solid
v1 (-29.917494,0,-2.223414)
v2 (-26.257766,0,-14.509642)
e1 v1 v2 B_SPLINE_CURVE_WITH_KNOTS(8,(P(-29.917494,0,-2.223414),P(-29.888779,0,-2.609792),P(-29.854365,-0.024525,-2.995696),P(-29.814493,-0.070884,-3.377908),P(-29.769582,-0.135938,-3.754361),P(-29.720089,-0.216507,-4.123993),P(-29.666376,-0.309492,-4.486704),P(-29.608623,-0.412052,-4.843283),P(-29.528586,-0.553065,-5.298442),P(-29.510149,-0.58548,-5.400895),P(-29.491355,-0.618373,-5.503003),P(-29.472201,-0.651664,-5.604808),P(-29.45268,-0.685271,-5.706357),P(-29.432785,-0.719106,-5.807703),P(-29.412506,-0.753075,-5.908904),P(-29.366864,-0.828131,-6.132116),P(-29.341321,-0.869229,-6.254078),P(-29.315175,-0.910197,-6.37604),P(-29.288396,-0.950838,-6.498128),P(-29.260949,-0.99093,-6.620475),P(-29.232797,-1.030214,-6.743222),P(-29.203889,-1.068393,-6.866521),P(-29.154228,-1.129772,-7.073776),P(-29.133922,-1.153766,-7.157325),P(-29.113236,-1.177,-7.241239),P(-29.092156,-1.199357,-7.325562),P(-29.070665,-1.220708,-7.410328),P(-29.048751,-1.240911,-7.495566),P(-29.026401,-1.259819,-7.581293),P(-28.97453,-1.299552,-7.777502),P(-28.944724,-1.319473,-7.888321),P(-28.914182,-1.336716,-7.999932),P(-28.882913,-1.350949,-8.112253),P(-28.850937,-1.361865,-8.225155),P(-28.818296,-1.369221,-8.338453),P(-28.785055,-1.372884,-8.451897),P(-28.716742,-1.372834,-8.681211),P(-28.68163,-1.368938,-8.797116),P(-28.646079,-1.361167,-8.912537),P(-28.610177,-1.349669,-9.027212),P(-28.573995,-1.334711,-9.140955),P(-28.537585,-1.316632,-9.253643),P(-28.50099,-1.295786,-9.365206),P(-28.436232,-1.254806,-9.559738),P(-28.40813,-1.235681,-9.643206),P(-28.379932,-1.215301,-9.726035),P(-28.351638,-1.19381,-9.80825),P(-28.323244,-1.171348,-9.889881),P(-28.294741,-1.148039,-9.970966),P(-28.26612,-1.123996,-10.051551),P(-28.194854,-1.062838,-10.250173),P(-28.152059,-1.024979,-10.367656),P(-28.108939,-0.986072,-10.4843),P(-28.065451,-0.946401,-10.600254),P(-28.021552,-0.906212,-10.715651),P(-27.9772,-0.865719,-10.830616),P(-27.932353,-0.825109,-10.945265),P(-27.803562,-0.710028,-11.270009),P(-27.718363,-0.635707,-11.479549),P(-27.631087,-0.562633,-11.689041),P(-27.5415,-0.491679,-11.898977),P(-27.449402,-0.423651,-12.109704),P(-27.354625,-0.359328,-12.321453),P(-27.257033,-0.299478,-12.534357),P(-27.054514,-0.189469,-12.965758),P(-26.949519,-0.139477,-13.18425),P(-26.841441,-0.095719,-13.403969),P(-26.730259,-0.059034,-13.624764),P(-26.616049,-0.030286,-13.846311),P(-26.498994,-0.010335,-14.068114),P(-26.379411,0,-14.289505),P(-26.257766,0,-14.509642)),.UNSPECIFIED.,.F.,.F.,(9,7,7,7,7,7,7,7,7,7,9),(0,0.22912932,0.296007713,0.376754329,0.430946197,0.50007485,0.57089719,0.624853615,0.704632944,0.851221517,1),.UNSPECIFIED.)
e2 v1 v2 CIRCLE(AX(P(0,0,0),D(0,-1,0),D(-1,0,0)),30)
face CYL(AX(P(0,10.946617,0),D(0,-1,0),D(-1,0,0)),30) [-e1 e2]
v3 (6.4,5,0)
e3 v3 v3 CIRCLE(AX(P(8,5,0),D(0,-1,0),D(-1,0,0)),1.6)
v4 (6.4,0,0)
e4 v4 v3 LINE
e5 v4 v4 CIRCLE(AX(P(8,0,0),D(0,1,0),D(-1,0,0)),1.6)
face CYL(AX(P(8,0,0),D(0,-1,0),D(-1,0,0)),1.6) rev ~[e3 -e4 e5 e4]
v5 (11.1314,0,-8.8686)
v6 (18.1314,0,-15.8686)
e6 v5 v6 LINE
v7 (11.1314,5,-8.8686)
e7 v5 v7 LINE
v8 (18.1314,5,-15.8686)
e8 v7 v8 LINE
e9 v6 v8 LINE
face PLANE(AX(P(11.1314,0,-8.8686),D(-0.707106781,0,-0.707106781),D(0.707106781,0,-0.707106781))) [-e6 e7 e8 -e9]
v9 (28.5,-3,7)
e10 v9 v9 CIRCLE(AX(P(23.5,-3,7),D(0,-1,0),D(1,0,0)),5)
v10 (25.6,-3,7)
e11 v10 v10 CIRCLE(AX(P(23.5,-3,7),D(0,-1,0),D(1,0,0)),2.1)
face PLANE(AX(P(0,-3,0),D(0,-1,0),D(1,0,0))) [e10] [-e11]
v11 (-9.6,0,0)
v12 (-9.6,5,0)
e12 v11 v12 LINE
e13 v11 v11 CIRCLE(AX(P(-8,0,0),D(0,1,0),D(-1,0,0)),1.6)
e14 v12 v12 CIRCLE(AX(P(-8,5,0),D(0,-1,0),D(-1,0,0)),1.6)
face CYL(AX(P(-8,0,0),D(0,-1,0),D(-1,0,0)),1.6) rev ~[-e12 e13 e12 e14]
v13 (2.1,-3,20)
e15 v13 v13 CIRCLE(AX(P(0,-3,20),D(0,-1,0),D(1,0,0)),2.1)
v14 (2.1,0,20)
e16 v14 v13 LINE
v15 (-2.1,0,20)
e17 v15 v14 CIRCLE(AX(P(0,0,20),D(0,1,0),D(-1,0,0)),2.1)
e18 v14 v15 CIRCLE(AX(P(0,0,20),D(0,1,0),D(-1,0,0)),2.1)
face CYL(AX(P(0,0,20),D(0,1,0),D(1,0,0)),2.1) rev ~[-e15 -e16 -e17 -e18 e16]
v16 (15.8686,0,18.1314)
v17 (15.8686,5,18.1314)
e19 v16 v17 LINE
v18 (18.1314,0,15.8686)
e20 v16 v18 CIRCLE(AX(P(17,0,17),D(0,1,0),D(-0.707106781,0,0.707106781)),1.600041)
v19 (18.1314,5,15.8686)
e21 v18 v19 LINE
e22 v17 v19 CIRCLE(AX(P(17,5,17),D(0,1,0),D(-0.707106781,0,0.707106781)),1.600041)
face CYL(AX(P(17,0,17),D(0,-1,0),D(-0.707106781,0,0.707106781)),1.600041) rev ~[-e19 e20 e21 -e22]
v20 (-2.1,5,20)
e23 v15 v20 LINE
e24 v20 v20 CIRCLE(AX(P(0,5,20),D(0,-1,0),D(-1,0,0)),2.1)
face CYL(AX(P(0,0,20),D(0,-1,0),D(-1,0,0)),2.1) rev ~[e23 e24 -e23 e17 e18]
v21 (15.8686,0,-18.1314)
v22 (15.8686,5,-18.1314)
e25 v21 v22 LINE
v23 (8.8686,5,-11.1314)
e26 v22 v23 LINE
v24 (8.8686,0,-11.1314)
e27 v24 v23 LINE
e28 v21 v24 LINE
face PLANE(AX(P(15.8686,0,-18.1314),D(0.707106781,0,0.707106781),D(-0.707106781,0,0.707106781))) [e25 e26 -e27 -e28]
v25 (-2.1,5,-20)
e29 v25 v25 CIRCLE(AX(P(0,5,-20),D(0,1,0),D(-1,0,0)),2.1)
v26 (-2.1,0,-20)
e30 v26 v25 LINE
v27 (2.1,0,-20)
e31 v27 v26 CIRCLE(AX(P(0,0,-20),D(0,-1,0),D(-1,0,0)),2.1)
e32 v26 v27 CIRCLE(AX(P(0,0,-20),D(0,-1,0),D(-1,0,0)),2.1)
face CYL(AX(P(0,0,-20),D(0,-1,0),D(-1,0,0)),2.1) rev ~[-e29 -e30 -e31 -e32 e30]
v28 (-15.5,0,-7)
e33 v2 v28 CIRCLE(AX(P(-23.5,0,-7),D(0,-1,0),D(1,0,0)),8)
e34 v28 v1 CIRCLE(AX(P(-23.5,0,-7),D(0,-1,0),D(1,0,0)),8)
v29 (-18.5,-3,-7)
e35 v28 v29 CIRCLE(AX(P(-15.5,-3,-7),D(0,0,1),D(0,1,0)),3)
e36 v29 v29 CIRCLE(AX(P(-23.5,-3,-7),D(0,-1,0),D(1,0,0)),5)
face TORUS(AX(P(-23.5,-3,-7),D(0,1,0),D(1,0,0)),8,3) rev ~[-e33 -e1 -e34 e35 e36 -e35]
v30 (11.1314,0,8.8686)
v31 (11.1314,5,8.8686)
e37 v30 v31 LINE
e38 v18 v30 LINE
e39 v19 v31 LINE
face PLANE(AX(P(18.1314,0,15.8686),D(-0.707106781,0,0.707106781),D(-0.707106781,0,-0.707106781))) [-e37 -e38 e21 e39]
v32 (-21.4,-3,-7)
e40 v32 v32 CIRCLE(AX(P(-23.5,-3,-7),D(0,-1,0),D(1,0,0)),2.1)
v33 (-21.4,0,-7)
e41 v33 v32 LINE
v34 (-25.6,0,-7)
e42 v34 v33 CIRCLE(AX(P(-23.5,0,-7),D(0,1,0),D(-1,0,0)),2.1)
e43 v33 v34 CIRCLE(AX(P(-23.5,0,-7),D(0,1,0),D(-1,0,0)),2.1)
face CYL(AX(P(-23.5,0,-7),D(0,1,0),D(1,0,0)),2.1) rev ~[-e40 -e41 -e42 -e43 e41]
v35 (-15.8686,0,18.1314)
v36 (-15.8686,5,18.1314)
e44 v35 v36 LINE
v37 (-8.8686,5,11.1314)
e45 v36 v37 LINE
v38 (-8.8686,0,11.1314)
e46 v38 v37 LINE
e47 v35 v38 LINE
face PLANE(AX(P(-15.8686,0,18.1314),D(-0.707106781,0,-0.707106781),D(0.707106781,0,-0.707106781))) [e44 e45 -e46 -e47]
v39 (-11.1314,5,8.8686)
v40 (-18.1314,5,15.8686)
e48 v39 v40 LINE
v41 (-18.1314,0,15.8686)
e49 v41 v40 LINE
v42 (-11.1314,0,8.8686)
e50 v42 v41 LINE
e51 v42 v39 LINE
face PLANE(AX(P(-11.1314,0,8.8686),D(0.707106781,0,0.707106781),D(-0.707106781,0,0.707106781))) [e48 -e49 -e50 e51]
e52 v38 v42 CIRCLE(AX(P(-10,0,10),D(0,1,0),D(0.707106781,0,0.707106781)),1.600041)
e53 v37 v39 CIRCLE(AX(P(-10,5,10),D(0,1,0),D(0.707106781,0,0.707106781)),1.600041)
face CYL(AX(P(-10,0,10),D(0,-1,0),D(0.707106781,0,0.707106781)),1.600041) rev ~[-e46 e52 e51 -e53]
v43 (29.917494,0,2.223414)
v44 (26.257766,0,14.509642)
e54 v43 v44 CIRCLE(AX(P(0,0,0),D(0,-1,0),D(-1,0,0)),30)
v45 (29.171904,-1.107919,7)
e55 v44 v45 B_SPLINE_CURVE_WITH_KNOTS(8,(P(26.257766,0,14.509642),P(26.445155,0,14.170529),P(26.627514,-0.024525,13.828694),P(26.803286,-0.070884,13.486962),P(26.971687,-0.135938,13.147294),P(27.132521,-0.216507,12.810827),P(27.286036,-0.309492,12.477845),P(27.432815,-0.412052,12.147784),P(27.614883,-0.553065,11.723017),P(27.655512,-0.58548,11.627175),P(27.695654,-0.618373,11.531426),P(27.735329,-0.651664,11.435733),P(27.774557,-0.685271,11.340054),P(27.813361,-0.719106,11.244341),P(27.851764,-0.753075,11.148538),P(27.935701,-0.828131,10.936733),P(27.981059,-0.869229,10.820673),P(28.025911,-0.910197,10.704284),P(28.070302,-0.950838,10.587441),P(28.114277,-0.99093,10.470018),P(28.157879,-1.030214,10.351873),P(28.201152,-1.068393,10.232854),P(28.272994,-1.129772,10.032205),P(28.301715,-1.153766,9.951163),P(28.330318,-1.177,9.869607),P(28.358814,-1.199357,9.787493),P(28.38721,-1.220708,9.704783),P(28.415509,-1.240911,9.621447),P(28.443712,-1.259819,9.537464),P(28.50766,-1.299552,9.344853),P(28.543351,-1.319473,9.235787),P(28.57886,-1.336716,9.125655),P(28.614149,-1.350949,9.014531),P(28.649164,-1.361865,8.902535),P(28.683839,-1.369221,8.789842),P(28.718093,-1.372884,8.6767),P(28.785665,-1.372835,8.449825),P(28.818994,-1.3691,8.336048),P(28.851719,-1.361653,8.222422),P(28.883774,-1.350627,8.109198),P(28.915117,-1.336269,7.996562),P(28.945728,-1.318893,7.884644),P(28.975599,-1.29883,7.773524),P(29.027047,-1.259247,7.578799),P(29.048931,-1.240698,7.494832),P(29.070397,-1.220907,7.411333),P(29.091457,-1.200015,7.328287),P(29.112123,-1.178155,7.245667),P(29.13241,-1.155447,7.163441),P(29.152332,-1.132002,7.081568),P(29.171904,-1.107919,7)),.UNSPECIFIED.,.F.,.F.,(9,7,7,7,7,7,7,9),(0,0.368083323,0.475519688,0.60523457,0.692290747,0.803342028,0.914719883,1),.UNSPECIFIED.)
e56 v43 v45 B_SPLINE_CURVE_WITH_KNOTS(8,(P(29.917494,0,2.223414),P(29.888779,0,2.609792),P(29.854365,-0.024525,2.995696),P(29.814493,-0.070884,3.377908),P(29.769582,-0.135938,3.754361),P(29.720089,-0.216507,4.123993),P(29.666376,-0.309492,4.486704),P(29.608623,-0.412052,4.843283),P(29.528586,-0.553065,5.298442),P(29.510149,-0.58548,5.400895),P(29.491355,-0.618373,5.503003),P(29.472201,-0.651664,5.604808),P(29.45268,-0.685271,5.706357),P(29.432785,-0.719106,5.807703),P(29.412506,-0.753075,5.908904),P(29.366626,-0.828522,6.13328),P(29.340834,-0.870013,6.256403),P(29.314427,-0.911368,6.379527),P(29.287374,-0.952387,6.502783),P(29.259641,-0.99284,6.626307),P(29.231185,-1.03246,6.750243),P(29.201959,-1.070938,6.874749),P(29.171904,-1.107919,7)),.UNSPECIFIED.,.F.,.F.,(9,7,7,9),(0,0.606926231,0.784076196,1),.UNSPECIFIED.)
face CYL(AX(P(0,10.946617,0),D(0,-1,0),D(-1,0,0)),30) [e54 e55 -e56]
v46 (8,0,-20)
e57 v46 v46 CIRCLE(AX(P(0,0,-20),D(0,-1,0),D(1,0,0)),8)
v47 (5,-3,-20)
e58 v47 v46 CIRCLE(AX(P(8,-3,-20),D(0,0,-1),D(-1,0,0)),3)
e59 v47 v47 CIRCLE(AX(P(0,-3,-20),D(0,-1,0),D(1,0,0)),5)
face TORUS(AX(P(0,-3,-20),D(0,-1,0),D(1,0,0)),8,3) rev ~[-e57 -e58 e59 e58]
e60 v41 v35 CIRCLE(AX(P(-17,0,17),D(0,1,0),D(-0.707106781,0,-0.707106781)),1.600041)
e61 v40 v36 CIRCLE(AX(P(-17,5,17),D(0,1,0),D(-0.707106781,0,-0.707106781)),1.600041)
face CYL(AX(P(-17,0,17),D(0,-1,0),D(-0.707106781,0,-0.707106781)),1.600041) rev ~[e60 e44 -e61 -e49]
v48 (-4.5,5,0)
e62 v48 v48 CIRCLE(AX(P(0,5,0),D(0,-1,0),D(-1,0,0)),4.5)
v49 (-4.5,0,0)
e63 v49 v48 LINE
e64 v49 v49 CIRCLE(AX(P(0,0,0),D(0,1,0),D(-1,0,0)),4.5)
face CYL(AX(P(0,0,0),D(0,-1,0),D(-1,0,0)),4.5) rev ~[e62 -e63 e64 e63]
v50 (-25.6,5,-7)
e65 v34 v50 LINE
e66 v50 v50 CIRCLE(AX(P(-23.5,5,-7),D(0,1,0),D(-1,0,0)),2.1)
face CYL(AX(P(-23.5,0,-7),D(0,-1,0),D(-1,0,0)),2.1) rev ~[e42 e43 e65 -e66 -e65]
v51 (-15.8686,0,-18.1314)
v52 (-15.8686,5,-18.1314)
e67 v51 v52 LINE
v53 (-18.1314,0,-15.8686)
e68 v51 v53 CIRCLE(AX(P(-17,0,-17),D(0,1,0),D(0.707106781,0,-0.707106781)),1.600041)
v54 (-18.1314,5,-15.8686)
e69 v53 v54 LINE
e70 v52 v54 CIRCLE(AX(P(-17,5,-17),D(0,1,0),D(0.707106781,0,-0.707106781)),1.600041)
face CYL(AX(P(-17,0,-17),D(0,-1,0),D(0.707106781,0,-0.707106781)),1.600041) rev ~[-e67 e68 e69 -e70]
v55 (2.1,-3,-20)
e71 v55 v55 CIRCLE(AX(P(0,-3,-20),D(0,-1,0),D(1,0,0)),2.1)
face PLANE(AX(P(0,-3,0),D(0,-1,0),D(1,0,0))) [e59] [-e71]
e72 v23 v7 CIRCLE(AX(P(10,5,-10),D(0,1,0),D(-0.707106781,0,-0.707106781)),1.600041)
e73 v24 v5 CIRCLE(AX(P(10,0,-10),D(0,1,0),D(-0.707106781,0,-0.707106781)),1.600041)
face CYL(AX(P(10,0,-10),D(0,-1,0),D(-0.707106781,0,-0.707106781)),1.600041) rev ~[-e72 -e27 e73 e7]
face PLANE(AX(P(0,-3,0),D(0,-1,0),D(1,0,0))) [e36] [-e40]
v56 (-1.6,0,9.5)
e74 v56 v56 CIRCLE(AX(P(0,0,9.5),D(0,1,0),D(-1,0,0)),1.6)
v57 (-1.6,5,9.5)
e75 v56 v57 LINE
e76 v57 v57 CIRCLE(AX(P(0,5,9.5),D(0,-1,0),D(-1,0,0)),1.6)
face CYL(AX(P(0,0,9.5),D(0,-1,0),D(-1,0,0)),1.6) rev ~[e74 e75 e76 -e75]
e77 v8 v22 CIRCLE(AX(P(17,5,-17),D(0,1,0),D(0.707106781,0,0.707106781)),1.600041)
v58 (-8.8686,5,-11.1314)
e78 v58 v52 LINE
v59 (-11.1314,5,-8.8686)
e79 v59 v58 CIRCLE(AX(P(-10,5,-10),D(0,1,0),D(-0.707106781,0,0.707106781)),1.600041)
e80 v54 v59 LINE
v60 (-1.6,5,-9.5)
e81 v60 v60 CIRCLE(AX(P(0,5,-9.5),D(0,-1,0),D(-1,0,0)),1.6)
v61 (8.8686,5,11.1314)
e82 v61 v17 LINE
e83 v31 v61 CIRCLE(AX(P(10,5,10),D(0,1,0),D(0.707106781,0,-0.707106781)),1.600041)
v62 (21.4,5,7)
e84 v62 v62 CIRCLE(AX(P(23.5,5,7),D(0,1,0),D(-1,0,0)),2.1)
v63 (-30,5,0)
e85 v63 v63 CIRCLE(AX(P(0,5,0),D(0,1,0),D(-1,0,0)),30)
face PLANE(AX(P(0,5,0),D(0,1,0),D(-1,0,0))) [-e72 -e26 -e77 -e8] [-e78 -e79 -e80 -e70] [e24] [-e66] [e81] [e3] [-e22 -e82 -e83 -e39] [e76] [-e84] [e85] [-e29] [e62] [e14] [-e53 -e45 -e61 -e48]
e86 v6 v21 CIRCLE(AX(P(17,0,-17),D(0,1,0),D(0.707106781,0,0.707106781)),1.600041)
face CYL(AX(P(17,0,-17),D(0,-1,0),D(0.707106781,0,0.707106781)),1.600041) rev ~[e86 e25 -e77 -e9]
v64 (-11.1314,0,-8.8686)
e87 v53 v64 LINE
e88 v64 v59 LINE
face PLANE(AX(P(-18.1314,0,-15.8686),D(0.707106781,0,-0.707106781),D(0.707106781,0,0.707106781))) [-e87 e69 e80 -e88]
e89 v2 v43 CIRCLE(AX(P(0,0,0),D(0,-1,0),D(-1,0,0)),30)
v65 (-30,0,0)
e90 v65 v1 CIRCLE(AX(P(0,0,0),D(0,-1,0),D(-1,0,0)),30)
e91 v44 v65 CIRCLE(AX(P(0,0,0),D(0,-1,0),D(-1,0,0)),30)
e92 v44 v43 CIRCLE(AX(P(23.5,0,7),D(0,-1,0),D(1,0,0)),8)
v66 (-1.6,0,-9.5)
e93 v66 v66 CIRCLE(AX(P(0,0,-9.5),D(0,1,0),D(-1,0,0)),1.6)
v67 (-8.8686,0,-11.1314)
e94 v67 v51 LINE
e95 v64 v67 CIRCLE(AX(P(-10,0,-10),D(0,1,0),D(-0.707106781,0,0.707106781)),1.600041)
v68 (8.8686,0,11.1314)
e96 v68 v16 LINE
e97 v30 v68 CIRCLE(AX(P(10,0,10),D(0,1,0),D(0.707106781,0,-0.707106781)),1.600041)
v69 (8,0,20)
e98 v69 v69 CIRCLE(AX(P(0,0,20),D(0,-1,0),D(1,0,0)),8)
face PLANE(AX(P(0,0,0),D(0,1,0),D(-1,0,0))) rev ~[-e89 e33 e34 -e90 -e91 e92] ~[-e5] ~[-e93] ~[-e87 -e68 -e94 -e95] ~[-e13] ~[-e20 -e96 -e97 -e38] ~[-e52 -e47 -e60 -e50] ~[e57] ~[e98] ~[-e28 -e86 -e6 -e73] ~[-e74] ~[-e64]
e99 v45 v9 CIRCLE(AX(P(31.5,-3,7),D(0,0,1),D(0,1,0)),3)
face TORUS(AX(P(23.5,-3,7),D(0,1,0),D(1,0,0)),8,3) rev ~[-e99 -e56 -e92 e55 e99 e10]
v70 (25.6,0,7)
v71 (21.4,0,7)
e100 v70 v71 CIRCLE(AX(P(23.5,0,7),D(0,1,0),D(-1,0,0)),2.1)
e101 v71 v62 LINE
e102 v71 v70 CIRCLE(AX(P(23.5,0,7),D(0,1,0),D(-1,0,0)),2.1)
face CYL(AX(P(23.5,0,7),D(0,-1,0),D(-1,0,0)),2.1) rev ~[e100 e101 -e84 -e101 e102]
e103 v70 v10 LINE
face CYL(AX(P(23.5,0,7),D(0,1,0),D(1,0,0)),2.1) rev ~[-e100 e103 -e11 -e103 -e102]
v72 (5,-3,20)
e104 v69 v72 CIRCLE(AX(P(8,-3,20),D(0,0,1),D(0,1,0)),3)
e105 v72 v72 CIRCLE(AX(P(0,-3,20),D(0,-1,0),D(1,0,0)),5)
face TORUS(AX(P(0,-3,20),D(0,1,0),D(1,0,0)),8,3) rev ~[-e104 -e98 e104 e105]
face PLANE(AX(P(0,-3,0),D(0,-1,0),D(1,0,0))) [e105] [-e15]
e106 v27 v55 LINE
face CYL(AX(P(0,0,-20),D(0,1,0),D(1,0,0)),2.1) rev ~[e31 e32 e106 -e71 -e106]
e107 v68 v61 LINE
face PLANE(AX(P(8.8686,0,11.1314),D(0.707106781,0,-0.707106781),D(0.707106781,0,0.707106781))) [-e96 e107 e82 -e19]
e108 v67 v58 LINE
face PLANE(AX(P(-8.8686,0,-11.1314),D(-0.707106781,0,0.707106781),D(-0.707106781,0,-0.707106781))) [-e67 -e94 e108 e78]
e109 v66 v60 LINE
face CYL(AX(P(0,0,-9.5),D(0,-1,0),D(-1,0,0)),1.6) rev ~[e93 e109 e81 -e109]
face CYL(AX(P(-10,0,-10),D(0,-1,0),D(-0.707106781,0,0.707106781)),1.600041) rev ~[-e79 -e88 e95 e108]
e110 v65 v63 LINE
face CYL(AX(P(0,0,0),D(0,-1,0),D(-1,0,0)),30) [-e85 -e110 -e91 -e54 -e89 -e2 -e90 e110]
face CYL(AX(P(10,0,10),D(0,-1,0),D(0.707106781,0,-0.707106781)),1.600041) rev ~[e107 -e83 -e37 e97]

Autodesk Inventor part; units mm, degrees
ref_plane "YZ Plane" through (0, 0, 0) normal (1, 0, 0) x (0, 1, 0)
ref_plane "XZ Plane" through (0, 0, 0) normal (0, 1, 0) x (-1, 0, 0)
ref_plane "XY Plane" through (0, 0, 0) normal (0, 0, 1) x (1, 0, 0)
sketch "스케치1" plane through (0, 0, 0) normal (0, 1, 0) x (-1, 0, 0)
  line L0 (23.5, -7) -> (-23.5, -7) construction
  line L1 (-23.5, -7) -> (-23.5, 7) construction
  line L2 (-23.5, 7) -> (23.5, 7) construction
  line L3 (23.5, 7) -> (23.5, -7) construction
  circle A0 centre (23.5, -7) radius 2.1
  circle A1 centre (-23.5, 7) radius 2.1
  circle A2 centre (0, -20) radius 2.1
  circle A3 centre (0, 20) radius 2.1
  circle A4 centre (0, 0) radius 4.5
  circle A5 centre (8, 0) radius 1.6
  circle A6 centre (0, 9.5) radius 1.6
  circle A7 centre (-8, 0) radius 1.6
  circle A8 centre (0, -9.5) radius 1.6
  line L4 (8, 0) -> (0, -9.5) construction
  line L5 (0, -9.5) -> (-8, 0) construction
  line L6 (-8, 0) -> (0, 9.5) construction
  line L7 (0, 9.5) -> (8, 0) construction
  line L8 (10, -10) -> (17, -17) construction
  line L9 (8.8686, -11.1314) -> (15.8686, -18.1314)
  line L10 (18.1314, -15.8686) -> (11.1314, -8.8686)
  arc A9 (11.1314, -8.8686) -> (8.8686, -11.1314) centre (10, -10) ccw
  arc A10 (15.8686, -18.1314) -> (18.1314, -15.8686) centre (17, -17) ccw
  line L11 (-10, -10) -> (-17, -17) construction
  line L12 (-11.1314, -8.8686) -> (-18.1314, -15.8686)
  line L13 (-15.8686, -18.1314) -> (-8.8686, -11.1314)
  arc A11 (-8.8686, -11.1314) -> (-11.1314, -8.8686) centre (-10, -10) ccw
  arc A12 (-18.1314, -15.8686) -> (-15.8686, -18.1314) centre (-17, -17) ccw
  line L14 (10, 10) -> (17, 17) construction
  line L15 (11.1314, 8.8686) -> (18.1314, 15.8686)
  line L16 (15.8686, 18.1314) -> (8.8686, 11.1314)
  arc A13 (8.8686, 11.1314) -> (11.1314, 8.8686) centre (10, 10) ccw
  arc A14 (18.1314, 15.8686) -> (15.8686, 18.1314) centre (17, 17) ccw
  line L17 (-10, 10) -> (-17, 17) construction
  line L18 (-8.8686, 11.1314) -> (-15.8686, 18.1314)
  line L19 (-18.1314, 15.8686) -> (-11.1314, 8.8686)
  arc A15 (-11.1314, 8.8686) -> (-8.8686, 11.1314) centre (-10, 10) ccw
  arc A16 (-15.8686, 18.1314) -> (-18.1314, 15.8686) centre (-17, 17) ccw
  line L20 (10, -10) -> (-10, -10) construction
  line L21 (-10, -10) -> (-10, 10) construction
  line L22 (-10, 10) -> (10, 10) construction
  line L23 (10, 10) -> (10, -10) construction
  circle A17 centre (0, 0) radius 30
  line L24 (42, 0) -> (-42, 0) projected
  line L25 (0, -42) -> (0, 42) projected
  line L26 (0, 9.5) -> (0, -9.5) construction
  line L27 (8, 0) -> (-8, 0) construction
  line L28 (28.5, -25) -> (-28.5, -25)
  line L29 (-28.5, -25) -> (-28.5, 25)
  line L30 (-28.5, 25) -> (28.5, 25)
  line L31 (28.5, 25) -> (28.5, -25)
  point P0 (13.5, -13.5)
  point P1 (-13.5, -13.5)
  point P2 (13.5, 13.5)
  point P3 (-13.5, 13.5)
  dimension "d0" = 4.2
  dimension "d1" = 40
  dimension "d2" = 47
  dimension "d3" = 14
  dimension "d4" = 3.2
  dimension "d5" = 16
  dimension "d6" = 19
  dimension "d7" = 9
  dimension "d8" = 20
  dimension "d9" = 34
  dimension "d10" = 1.6
  dimension "d11" = 60
  dimension "d18" = 5
  dimension "d19" = 5
extrude "돌출1" add sketch "스케치1" along normal blind 5 contours A2 L25 A8 A4 L24 A5 L31 A17 L28 | A2 L25 L28 A17 L29 L24 A7 A4 A8 | L28 A17 L25 | L25 A17 L28 | L31 L24 A17 | A17 L24 L29 | L24 A7 L29 A17 L30 L25 A3 A6 A4 | A4 L25 A6 A3 L30 A17 L31 L24 A5 | L24 L31 A17 | A17 L29 L24 | L30 L25 A17 | A17 L25 L30
sketch "스케치2" plane through (0, 0, 0) normal (0, -1, 0) x (1, 0, 0)
  circle A0 centre (0, 0) radius 30 projected
  circle A1 centre (0, 0) radius 4.5 projected
  circle A2 centre (8, 0) radius 1.6 projected
  circle A3 centre (0, -20) radius 2.1 projected
  circle A4 centre (0, -9.5) radius 1.6 projected
  circle A5 centre (-8, 0) radius 1.6 projected
  arc A6 (8.8686, 11.1314) -> (11.1314, 8.8686) centre (10, 10) ccw projected
  line L0 (15.8686, 18.1314) -> (8.8686, 11.1314) projected
  arc A7 (18.1314, 15.8686) -> (15.8686, 18.1314) centre (17, 17) ccw projected
  line L1 (11.1314, 8.8686) -> (18.1314, 15.8686) projected
  circle A8 centre (23.5, 7) radius 2.1 projected
  arc A9 (-11.1314, 8.8686) -> (-8.8686, 11.1314) centre (-10, 10) ccw projected
  line L2 (-18.1314, 15.8686) -> (-11.1314, 8.8686) projected
  arc A10 (-15.8686, 18.1314) -> (-18.1314, 15.8686) centre (-17, 17) ccw projected
  line L3 (-8.8686, 11.1314) -> (-15.8686, 18.1314) projected
  circle A11 centre (0, 20) radius 2.1 projected
  circle A12 centre (0, 9.5) radius 1.6 projected
  circle A13 centre (-23.5, -7) radius 2.1 projected
  arc A14 (-8.8686, -11.1314) -> (-11.1314, -8.8686) centre (-10, -10) ccw projected
  line L4 (-15.8686, -18.1314) -> (-8.8686, -11.1314) projected
  arc A15 (-18.1314, -15.8686) -> (-15.8686, -18.1314) centre (-17, -17) ccw projected
  line L5 (-11.1314, -8.8686) -> (-18.1314, -15.8686) projected
  arc A16 (11.1314, -8.8686) -> (8.8686, -11.1314) centre (10, -10) ccw projected
  line L6 (18.1314, -15.8686) -> (11.1314, -8.8686) projected
  arc A17 (15.8686, -18.1314) -> (18.1314, -15.8686) centre (17, -17) ccw projected
  line L7 (8.8686, -11.1314) -> (15.8686, -18.1314) projected
  circle A18 centre (0, 20) radius 5
  circle A19 centre (23.5, 7) radius 2.1 projected
  circle A20 centre (23.5, 7) radius 5
  circle A21 centre (0, -20) radius 2.1 projected
  circle A22 centre (0, -20) radius 5
  circle A23 centre (-23.5, -7) radius 2.1 projected
  circle A24 centre (-23.5, -7) radius 5
  dimension "d14" = 10
extrude "돌출2" add sketch "스케치2" along normal blind 3 contours A18 | A20 | A22 | A24
fillet "모깎기1" radius 3 4 edges at (-5, 0, 20) (-28.5, 0, -7) (-5, 0, -20) (18.5, 0, 7)
properties part number "motor_mount" material "PC/ABS 플라스틱"
